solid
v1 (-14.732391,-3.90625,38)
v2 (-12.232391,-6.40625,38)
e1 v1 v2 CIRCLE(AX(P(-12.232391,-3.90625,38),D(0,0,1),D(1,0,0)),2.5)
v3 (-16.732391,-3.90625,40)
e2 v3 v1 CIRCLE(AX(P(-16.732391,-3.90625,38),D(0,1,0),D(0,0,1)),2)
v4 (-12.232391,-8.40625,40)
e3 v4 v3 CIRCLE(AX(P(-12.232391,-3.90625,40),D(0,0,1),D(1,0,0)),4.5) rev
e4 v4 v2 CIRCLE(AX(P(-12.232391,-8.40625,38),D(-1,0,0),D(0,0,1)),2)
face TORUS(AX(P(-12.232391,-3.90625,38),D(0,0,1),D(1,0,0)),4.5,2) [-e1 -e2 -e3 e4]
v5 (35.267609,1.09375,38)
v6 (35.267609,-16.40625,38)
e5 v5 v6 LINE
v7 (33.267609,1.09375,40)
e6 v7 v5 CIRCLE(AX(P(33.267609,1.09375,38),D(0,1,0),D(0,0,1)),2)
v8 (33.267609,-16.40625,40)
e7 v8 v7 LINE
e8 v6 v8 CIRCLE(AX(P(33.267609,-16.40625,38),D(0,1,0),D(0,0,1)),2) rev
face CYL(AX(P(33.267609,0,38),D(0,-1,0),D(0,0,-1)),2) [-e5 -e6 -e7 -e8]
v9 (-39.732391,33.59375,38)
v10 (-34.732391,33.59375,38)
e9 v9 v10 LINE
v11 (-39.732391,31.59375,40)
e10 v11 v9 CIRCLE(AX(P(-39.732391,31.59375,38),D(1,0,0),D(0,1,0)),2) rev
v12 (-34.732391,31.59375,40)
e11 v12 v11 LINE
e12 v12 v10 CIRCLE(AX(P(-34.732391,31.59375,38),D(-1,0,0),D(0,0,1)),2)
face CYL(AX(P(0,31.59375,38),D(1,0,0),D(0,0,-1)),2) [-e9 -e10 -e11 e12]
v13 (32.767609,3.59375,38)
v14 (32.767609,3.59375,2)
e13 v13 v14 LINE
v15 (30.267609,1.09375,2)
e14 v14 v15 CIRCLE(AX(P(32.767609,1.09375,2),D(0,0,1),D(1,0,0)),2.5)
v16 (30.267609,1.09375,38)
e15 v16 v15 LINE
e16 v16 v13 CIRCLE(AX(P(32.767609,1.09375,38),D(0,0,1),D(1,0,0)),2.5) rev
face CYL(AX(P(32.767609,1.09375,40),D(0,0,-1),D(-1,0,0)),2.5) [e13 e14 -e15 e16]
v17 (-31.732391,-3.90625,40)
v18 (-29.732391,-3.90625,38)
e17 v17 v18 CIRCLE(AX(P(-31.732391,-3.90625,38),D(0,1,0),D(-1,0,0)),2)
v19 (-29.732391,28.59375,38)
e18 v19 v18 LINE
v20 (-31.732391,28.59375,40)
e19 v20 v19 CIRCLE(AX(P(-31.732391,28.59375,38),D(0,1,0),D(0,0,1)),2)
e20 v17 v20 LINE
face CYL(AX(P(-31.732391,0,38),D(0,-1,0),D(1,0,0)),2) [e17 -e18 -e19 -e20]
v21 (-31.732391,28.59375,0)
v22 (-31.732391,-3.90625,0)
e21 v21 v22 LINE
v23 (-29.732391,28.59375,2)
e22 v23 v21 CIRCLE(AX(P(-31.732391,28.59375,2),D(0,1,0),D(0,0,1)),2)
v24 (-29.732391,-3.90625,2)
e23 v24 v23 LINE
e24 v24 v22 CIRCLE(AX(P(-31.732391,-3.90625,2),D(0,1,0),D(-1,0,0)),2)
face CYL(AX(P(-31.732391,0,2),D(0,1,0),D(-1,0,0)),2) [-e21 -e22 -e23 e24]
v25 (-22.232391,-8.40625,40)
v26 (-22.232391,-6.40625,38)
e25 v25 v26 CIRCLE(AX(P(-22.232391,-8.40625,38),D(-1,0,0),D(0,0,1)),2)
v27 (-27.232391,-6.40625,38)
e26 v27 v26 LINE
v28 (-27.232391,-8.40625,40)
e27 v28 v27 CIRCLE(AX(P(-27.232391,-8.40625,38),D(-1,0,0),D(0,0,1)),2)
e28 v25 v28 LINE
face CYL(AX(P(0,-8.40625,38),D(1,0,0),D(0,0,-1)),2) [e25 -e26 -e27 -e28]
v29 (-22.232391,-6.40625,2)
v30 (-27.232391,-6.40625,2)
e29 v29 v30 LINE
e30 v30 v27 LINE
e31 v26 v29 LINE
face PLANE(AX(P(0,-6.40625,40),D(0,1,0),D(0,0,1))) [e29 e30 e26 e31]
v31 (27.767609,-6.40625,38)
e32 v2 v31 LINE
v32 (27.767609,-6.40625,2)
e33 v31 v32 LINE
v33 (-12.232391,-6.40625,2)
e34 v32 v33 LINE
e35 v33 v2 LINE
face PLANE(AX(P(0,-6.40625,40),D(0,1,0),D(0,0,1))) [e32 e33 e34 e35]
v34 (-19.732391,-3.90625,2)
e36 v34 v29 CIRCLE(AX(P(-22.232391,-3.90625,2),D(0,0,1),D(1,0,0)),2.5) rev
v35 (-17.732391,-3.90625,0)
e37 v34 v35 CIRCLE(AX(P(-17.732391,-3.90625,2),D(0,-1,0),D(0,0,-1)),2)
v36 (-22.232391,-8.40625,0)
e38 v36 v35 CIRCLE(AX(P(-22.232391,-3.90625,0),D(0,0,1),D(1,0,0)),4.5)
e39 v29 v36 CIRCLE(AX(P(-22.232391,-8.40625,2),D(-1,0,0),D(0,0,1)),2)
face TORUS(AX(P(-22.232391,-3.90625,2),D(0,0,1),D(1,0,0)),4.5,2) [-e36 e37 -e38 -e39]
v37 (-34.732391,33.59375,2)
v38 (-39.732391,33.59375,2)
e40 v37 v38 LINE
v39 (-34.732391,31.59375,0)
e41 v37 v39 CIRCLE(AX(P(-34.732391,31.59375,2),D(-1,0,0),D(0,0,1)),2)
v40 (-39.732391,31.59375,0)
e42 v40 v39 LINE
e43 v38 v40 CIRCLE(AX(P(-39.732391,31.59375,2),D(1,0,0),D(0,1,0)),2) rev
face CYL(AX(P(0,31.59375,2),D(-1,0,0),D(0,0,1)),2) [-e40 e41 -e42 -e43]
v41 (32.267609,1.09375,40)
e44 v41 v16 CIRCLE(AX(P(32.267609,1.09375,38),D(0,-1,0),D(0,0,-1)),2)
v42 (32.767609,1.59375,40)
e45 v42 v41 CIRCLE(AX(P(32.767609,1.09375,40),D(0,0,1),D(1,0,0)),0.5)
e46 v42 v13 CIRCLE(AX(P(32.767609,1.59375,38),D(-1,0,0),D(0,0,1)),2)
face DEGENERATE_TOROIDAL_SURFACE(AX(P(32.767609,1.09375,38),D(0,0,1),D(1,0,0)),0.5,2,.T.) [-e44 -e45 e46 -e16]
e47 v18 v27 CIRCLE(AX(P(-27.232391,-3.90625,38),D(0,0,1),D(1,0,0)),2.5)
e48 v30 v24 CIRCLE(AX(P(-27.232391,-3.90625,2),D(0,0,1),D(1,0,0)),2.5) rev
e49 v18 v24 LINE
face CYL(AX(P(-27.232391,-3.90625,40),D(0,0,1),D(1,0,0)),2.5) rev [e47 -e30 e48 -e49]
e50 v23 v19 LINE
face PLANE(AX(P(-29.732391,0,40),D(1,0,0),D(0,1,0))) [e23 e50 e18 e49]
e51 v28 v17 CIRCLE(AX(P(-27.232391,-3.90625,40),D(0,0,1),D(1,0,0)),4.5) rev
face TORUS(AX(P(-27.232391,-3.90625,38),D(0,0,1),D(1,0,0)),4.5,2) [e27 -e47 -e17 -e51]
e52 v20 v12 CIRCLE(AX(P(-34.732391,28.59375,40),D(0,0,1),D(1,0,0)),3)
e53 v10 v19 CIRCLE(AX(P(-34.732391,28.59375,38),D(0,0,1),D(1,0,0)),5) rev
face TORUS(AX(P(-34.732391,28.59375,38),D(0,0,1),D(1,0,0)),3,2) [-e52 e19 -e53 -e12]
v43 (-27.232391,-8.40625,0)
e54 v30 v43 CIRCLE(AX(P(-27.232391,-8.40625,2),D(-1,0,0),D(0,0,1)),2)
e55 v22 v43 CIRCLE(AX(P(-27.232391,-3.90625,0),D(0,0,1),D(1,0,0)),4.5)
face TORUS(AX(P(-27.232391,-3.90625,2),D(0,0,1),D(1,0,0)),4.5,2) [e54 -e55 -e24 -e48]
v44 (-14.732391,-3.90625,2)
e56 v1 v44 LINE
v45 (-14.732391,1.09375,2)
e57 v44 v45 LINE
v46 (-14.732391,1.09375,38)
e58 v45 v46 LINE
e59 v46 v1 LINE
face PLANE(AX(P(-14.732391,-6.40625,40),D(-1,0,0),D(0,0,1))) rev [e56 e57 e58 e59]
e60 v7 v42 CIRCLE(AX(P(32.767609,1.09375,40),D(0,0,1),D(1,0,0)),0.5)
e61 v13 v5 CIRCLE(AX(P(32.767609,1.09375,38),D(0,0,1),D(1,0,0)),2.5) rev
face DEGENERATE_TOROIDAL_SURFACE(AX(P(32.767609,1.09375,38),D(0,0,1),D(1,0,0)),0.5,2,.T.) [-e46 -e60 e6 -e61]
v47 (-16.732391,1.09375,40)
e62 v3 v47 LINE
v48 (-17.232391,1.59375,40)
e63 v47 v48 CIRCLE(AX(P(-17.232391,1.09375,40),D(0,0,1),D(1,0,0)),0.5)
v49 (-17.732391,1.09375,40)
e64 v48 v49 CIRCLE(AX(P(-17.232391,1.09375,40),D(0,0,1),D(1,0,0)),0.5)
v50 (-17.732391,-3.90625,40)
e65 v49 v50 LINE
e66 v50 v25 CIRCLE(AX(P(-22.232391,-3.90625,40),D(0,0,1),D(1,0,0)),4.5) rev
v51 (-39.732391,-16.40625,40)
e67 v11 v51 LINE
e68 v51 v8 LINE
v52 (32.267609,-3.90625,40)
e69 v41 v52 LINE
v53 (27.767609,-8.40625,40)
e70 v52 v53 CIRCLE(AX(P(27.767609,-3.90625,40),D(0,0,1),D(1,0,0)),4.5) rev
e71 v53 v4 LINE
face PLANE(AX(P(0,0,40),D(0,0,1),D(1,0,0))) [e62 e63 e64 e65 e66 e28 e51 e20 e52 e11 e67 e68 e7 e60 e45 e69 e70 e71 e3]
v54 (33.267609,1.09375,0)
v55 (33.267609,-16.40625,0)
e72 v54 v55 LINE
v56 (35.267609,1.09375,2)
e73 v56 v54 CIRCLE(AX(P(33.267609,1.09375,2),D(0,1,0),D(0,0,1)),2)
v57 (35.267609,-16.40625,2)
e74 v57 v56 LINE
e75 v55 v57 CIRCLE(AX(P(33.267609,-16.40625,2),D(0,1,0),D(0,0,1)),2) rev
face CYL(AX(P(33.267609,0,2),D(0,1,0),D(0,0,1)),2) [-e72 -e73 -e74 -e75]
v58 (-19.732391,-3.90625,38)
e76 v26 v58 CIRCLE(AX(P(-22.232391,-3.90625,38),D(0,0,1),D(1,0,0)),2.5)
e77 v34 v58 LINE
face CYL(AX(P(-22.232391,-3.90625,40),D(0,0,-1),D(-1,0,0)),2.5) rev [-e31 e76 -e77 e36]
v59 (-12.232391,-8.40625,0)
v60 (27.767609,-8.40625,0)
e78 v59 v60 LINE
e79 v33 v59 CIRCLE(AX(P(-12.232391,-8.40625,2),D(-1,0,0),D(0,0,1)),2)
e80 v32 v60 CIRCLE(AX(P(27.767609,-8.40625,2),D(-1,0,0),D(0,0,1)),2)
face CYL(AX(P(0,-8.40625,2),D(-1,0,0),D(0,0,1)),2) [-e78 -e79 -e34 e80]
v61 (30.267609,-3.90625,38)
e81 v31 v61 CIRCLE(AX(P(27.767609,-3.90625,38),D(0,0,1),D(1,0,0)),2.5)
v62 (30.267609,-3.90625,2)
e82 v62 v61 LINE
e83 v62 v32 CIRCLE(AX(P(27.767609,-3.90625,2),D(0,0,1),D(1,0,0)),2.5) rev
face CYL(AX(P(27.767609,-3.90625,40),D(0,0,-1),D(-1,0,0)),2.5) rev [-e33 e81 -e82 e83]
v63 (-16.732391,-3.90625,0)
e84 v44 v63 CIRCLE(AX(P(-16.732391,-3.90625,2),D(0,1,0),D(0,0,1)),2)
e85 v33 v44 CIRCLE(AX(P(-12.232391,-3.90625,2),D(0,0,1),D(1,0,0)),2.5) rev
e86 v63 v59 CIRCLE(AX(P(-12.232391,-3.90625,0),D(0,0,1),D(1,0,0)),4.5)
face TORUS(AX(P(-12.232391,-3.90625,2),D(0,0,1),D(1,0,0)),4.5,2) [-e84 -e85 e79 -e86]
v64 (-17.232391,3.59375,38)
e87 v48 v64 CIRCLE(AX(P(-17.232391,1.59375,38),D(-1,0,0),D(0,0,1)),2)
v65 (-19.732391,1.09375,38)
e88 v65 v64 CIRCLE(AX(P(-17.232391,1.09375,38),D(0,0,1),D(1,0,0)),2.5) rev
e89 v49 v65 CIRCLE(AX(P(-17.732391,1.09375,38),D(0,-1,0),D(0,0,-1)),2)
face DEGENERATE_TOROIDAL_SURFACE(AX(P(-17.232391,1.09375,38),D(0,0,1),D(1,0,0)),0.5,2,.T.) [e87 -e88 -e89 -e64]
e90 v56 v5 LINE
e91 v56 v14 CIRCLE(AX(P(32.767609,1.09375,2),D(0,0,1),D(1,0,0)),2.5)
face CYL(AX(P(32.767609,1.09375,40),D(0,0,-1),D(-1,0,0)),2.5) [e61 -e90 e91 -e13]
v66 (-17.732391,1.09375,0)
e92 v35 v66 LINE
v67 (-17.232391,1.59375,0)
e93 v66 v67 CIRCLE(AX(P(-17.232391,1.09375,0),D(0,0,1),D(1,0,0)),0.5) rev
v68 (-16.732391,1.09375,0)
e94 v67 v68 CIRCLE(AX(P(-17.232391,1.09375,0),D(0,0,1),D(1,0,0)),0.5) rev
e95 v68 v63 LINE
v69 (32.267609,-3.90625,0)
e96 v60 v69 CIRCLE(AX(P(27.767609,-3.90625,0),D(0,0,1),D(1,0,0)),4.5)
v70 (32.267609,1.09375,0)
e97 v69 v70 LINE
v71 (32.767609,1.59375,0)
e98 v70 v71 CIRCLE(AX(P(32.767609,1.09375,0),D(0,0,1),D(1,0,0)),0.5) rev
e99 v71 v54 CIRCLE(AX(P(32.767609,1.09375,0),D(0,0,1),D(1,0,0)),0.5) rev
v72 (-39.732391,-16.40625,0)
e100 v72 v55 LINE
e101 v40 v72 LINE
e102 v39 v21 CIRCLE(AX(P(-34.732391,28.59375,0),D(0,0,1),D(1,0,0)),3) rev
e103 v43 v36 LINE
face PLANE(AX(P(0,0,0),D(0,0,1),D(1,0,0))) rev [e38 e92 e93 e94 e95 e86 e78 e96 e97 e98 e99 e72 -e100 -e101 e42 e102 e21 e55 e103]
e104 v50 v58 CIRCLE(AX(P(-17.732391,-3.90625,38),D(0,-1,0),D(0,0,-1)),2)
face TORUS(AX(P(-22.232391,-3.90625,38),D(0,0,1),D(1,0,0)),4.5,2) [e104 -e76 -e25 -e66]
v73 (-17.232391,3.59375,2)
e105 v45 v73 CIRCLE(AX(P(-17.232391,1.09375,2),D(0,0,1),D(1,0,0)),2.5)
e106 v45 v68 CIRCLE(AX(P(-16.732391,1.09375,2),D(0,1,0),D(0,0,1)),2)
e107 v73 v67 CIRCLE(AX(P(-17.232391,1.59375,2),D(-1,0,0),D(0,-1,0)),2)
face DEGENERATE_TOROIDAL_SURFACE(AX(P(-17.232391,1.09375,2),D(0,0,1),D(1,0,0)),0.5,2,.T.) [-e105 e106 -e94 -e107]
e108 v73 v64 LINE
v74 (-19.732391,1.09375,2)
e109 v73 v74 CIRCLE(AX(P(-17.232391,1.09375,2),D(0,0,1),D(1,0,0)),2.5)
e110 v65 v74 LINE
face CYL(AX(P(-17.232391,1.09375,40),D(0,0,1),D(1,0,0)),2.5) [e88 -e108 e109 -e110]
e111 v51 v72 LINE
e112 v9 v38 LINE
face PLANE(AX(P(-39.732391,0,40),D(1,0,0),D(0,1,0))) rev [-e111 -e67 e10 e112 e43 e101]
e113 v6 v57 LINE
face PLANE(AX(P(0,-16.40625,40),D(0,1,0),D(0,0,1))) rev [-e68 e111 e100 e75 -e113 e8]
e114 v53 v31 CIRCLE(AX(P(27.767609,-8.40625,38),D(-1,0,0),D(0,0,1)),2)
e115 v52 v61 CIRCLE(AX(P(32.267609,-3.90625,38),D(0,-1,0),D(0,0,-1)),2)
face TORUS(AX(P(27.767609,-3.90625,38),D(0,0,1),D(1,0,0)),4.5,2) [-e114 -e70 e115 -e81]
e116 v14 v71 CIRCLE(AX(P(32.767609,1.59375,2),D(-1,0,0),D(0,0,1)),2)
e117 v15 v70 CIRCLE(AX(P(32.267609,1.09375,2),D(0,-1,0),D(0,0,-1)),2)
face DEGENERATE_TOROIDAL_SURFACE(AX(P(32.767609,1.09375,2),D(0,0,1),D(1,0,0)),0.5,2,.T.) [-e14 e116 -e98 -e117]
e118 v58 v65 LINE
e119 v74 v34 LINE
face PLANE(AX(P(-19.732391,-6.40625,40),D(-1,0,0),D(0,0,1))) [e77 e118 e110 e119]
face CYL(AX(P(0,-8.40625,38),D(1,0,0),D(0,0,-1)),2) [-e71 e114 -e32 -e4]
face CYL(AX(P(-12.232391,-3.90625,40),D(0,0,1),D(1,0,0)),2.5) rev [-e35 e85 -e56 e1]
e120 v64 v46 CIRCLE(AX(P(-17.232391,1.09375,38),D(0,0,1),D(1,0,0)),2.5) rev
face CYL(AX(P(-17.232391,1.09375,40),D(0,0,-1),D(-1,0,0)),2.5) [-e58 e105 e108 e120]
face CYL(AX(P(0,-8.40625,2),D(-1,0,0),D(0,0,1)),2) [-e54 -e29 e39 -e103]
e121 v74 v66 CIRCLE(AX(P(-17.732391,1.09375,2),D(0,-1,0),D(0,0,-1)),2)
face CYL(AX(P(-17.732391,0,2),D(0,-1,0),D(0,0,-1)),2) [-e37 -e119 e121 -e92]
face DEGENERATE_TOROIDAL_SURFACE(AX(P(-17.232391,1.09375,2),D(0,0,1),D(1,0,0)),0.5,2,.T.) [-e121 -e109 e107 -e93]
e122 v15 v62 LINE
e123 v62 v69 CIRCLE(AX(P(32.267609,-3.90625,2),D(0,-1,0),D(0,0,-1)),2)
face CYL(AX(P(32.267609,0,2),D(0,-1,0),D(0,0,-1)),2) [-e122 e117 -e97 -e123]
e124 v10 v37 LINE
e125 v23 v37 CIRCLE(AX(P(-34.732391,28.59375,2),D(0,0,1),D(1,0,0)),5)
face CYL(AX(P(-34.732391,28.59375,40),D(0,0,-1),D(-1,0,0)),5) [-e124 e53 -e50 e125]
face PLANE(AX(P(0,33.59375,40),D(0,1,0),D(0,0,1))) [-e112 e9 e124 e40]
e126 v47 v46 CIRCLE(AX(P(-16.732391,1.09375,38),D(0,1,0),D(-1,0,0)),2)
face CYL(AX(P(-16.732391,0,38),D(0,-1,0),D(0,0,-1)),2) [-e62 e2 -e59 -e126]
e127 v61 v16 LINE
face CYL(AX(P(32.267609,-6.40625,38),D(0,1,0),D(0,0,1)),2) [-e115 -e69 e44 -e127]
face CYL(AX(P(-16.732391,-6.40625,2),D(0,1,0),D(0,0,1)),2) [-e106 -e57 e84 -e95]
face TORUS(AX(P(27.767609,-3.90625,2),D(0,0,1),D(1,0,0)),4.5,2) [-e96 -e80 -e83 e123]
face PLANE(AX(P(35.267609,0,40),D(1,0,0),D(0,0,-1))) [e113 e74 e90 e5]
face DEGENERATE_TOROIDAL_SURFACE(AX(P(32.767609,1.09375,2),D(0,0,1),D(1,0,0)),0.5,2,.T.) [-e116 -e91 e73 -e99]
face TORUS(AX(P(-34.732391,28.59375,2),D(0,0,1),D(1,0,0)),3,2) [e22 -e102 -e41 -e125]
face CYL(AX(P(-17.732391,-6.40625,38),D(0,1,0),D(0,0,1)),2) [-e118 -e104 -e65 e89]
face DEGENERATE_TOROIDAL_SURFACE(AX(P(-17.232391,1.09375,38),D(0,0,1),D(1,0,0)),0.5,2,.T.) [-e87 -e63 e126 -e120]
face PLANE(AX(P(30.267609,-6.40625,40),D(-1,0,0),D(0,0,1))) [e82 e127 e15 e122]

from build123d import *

# Parameters (mm, degrees)
SKETCH_1_W      = 10
SKETCH_1_H      = 40
SKETCH_1_W_2    = 5
SKETCH_1_H_2    = 10
EXTRUDE_1_DEPTH = 40
FILLET_2_R      = 5
FILLET_3_R      = 2.5
FILLET_4_R      = 2.5
FILLET_6_R      = 2


with BuildPart() as part:
    # 草圖1 → 填料-伸長1 (new body)
    with BuildSketch(Plane.XY):
        with Locations((-34.732391425, 13.59375)):
            Rectangle(SKETCH_1_W, SKETCH_1_H)
        Polygon((-29.732391425, -6.40625), (-39.732391425, -6.40625), (-39.732391425, -16.40625), (35.267608575, -16.40625), (35.267608575, -6.40625), (30.267608575, -6.40625), (-14.732391425, -6.40625), (-19.732391425, -6.40625), align=None)
        with Locations((-17.232391425, -1.40625)):
            Rectangle(SKETCH_1_W_2, SKETCH_1_H_2)
        with Locations((32.767608575, -1.40625)):
            Rectangle(SKETCH_1_W_2, SKETCH_1_H_2)
    extrude(amount=EXTRUDE_1_DEPTH)

    # 圓角2
    fillet_2_edges = [part.edges().sort_by_distance(p)[0] for p in [
        (-29.732391425, 33.59375, 20),
    ]]
    fillet(fillet_2_edges, radius=FILLET_2_R)

    # 圓角3
    fillet_3_edges = [part.edges().sort_by_distance(p)[0] for p in [
        (-29.732391425, -6.40625, 20),
        (-19.732391425, -6.40625, 20),
    ]]
    fillet(fillet_3_edges, radius=FILLET_3_R)

    # 圓角4
    fillet_4_edges = [part.edges().sort_by_distance(p)[0] for p in [
        (30.267608575, -6.40625, 20),
        (30.267608575, 3.59375, 20),
        (35.267608575, 3.59375, 20),
        (-14.732391425, -6.40625, 20),
        (-14.732391425, 3.59375, 20),
        (-19.732391425, 3.59375, 20),
    ]]
    fillet(fillet_4_edges, radius=FILLET_4_R - 0.0001)  # a hair under: the kernel refuses the full size

    # 圓角6
    fillet_6_edges = [part.edges().sort_by_distance(p)[0] for p in [
        (-37.232391425, 33.59375, 40),
        (-37.232391425, 33.59375, 0),
        (-29.732391425, 12.34375, 0),
        (-31.196857519, 32.129283906, 0),
        (-29.732391425, 12.34375, 40),
        (-31.196857519, 32.129283906, 40),
        (-19.732391425, -1.4062, 0),
        (-19.732391425, -1.4062, 40),
        (-24.732391425, -6.40625, 0),
        (-24.732391425, -6.40625, 40),
        (-20.464624472, -5.674016953, 40),
        (-20.464624472, -5.674016953, 0),
        (-29.000158378, -5.674016953, 0),
        (-29.000158378, -5.674016953, 40),
        (30.267608575, -1.40625, 0),
        (30.267608575, -1.40625, 40),
        (7.767608575, -6.40625, 0),
        (7.767608575, -6.40625, 40),
        (-14.732391425, -1.40625, 0),
        (35.267608575, -7.6562, 0),
        (-19.000187668, 2.861546242, 0),
        (-15.464595183, 2.861546242, 0),
        (34.535404817, 2.861546242, 0),
        (30.999812332, 2.861546242, 0),
        (35.267608575, -7.6562, 40),
        (-14.732391425, -1.40625, 40),
        (-19.000187668, 2.861546242, 40),
        (-15.464595183, 2.861546242, 40),
        (34.535404817, 2.861546242, 40),
        (30.999812332, 2.861546242, 40),
        (29.535404817, -5.674046242, 40),
        (29.535404817, -5.674046242, 0),
        (-14.000187668, -5.674046242, 40),
        (-14.000187668, -5.674046242, 0),
    ]]
    fillet(fillet_6_edges, radius=FILLET_6_R)


solid = part.part
